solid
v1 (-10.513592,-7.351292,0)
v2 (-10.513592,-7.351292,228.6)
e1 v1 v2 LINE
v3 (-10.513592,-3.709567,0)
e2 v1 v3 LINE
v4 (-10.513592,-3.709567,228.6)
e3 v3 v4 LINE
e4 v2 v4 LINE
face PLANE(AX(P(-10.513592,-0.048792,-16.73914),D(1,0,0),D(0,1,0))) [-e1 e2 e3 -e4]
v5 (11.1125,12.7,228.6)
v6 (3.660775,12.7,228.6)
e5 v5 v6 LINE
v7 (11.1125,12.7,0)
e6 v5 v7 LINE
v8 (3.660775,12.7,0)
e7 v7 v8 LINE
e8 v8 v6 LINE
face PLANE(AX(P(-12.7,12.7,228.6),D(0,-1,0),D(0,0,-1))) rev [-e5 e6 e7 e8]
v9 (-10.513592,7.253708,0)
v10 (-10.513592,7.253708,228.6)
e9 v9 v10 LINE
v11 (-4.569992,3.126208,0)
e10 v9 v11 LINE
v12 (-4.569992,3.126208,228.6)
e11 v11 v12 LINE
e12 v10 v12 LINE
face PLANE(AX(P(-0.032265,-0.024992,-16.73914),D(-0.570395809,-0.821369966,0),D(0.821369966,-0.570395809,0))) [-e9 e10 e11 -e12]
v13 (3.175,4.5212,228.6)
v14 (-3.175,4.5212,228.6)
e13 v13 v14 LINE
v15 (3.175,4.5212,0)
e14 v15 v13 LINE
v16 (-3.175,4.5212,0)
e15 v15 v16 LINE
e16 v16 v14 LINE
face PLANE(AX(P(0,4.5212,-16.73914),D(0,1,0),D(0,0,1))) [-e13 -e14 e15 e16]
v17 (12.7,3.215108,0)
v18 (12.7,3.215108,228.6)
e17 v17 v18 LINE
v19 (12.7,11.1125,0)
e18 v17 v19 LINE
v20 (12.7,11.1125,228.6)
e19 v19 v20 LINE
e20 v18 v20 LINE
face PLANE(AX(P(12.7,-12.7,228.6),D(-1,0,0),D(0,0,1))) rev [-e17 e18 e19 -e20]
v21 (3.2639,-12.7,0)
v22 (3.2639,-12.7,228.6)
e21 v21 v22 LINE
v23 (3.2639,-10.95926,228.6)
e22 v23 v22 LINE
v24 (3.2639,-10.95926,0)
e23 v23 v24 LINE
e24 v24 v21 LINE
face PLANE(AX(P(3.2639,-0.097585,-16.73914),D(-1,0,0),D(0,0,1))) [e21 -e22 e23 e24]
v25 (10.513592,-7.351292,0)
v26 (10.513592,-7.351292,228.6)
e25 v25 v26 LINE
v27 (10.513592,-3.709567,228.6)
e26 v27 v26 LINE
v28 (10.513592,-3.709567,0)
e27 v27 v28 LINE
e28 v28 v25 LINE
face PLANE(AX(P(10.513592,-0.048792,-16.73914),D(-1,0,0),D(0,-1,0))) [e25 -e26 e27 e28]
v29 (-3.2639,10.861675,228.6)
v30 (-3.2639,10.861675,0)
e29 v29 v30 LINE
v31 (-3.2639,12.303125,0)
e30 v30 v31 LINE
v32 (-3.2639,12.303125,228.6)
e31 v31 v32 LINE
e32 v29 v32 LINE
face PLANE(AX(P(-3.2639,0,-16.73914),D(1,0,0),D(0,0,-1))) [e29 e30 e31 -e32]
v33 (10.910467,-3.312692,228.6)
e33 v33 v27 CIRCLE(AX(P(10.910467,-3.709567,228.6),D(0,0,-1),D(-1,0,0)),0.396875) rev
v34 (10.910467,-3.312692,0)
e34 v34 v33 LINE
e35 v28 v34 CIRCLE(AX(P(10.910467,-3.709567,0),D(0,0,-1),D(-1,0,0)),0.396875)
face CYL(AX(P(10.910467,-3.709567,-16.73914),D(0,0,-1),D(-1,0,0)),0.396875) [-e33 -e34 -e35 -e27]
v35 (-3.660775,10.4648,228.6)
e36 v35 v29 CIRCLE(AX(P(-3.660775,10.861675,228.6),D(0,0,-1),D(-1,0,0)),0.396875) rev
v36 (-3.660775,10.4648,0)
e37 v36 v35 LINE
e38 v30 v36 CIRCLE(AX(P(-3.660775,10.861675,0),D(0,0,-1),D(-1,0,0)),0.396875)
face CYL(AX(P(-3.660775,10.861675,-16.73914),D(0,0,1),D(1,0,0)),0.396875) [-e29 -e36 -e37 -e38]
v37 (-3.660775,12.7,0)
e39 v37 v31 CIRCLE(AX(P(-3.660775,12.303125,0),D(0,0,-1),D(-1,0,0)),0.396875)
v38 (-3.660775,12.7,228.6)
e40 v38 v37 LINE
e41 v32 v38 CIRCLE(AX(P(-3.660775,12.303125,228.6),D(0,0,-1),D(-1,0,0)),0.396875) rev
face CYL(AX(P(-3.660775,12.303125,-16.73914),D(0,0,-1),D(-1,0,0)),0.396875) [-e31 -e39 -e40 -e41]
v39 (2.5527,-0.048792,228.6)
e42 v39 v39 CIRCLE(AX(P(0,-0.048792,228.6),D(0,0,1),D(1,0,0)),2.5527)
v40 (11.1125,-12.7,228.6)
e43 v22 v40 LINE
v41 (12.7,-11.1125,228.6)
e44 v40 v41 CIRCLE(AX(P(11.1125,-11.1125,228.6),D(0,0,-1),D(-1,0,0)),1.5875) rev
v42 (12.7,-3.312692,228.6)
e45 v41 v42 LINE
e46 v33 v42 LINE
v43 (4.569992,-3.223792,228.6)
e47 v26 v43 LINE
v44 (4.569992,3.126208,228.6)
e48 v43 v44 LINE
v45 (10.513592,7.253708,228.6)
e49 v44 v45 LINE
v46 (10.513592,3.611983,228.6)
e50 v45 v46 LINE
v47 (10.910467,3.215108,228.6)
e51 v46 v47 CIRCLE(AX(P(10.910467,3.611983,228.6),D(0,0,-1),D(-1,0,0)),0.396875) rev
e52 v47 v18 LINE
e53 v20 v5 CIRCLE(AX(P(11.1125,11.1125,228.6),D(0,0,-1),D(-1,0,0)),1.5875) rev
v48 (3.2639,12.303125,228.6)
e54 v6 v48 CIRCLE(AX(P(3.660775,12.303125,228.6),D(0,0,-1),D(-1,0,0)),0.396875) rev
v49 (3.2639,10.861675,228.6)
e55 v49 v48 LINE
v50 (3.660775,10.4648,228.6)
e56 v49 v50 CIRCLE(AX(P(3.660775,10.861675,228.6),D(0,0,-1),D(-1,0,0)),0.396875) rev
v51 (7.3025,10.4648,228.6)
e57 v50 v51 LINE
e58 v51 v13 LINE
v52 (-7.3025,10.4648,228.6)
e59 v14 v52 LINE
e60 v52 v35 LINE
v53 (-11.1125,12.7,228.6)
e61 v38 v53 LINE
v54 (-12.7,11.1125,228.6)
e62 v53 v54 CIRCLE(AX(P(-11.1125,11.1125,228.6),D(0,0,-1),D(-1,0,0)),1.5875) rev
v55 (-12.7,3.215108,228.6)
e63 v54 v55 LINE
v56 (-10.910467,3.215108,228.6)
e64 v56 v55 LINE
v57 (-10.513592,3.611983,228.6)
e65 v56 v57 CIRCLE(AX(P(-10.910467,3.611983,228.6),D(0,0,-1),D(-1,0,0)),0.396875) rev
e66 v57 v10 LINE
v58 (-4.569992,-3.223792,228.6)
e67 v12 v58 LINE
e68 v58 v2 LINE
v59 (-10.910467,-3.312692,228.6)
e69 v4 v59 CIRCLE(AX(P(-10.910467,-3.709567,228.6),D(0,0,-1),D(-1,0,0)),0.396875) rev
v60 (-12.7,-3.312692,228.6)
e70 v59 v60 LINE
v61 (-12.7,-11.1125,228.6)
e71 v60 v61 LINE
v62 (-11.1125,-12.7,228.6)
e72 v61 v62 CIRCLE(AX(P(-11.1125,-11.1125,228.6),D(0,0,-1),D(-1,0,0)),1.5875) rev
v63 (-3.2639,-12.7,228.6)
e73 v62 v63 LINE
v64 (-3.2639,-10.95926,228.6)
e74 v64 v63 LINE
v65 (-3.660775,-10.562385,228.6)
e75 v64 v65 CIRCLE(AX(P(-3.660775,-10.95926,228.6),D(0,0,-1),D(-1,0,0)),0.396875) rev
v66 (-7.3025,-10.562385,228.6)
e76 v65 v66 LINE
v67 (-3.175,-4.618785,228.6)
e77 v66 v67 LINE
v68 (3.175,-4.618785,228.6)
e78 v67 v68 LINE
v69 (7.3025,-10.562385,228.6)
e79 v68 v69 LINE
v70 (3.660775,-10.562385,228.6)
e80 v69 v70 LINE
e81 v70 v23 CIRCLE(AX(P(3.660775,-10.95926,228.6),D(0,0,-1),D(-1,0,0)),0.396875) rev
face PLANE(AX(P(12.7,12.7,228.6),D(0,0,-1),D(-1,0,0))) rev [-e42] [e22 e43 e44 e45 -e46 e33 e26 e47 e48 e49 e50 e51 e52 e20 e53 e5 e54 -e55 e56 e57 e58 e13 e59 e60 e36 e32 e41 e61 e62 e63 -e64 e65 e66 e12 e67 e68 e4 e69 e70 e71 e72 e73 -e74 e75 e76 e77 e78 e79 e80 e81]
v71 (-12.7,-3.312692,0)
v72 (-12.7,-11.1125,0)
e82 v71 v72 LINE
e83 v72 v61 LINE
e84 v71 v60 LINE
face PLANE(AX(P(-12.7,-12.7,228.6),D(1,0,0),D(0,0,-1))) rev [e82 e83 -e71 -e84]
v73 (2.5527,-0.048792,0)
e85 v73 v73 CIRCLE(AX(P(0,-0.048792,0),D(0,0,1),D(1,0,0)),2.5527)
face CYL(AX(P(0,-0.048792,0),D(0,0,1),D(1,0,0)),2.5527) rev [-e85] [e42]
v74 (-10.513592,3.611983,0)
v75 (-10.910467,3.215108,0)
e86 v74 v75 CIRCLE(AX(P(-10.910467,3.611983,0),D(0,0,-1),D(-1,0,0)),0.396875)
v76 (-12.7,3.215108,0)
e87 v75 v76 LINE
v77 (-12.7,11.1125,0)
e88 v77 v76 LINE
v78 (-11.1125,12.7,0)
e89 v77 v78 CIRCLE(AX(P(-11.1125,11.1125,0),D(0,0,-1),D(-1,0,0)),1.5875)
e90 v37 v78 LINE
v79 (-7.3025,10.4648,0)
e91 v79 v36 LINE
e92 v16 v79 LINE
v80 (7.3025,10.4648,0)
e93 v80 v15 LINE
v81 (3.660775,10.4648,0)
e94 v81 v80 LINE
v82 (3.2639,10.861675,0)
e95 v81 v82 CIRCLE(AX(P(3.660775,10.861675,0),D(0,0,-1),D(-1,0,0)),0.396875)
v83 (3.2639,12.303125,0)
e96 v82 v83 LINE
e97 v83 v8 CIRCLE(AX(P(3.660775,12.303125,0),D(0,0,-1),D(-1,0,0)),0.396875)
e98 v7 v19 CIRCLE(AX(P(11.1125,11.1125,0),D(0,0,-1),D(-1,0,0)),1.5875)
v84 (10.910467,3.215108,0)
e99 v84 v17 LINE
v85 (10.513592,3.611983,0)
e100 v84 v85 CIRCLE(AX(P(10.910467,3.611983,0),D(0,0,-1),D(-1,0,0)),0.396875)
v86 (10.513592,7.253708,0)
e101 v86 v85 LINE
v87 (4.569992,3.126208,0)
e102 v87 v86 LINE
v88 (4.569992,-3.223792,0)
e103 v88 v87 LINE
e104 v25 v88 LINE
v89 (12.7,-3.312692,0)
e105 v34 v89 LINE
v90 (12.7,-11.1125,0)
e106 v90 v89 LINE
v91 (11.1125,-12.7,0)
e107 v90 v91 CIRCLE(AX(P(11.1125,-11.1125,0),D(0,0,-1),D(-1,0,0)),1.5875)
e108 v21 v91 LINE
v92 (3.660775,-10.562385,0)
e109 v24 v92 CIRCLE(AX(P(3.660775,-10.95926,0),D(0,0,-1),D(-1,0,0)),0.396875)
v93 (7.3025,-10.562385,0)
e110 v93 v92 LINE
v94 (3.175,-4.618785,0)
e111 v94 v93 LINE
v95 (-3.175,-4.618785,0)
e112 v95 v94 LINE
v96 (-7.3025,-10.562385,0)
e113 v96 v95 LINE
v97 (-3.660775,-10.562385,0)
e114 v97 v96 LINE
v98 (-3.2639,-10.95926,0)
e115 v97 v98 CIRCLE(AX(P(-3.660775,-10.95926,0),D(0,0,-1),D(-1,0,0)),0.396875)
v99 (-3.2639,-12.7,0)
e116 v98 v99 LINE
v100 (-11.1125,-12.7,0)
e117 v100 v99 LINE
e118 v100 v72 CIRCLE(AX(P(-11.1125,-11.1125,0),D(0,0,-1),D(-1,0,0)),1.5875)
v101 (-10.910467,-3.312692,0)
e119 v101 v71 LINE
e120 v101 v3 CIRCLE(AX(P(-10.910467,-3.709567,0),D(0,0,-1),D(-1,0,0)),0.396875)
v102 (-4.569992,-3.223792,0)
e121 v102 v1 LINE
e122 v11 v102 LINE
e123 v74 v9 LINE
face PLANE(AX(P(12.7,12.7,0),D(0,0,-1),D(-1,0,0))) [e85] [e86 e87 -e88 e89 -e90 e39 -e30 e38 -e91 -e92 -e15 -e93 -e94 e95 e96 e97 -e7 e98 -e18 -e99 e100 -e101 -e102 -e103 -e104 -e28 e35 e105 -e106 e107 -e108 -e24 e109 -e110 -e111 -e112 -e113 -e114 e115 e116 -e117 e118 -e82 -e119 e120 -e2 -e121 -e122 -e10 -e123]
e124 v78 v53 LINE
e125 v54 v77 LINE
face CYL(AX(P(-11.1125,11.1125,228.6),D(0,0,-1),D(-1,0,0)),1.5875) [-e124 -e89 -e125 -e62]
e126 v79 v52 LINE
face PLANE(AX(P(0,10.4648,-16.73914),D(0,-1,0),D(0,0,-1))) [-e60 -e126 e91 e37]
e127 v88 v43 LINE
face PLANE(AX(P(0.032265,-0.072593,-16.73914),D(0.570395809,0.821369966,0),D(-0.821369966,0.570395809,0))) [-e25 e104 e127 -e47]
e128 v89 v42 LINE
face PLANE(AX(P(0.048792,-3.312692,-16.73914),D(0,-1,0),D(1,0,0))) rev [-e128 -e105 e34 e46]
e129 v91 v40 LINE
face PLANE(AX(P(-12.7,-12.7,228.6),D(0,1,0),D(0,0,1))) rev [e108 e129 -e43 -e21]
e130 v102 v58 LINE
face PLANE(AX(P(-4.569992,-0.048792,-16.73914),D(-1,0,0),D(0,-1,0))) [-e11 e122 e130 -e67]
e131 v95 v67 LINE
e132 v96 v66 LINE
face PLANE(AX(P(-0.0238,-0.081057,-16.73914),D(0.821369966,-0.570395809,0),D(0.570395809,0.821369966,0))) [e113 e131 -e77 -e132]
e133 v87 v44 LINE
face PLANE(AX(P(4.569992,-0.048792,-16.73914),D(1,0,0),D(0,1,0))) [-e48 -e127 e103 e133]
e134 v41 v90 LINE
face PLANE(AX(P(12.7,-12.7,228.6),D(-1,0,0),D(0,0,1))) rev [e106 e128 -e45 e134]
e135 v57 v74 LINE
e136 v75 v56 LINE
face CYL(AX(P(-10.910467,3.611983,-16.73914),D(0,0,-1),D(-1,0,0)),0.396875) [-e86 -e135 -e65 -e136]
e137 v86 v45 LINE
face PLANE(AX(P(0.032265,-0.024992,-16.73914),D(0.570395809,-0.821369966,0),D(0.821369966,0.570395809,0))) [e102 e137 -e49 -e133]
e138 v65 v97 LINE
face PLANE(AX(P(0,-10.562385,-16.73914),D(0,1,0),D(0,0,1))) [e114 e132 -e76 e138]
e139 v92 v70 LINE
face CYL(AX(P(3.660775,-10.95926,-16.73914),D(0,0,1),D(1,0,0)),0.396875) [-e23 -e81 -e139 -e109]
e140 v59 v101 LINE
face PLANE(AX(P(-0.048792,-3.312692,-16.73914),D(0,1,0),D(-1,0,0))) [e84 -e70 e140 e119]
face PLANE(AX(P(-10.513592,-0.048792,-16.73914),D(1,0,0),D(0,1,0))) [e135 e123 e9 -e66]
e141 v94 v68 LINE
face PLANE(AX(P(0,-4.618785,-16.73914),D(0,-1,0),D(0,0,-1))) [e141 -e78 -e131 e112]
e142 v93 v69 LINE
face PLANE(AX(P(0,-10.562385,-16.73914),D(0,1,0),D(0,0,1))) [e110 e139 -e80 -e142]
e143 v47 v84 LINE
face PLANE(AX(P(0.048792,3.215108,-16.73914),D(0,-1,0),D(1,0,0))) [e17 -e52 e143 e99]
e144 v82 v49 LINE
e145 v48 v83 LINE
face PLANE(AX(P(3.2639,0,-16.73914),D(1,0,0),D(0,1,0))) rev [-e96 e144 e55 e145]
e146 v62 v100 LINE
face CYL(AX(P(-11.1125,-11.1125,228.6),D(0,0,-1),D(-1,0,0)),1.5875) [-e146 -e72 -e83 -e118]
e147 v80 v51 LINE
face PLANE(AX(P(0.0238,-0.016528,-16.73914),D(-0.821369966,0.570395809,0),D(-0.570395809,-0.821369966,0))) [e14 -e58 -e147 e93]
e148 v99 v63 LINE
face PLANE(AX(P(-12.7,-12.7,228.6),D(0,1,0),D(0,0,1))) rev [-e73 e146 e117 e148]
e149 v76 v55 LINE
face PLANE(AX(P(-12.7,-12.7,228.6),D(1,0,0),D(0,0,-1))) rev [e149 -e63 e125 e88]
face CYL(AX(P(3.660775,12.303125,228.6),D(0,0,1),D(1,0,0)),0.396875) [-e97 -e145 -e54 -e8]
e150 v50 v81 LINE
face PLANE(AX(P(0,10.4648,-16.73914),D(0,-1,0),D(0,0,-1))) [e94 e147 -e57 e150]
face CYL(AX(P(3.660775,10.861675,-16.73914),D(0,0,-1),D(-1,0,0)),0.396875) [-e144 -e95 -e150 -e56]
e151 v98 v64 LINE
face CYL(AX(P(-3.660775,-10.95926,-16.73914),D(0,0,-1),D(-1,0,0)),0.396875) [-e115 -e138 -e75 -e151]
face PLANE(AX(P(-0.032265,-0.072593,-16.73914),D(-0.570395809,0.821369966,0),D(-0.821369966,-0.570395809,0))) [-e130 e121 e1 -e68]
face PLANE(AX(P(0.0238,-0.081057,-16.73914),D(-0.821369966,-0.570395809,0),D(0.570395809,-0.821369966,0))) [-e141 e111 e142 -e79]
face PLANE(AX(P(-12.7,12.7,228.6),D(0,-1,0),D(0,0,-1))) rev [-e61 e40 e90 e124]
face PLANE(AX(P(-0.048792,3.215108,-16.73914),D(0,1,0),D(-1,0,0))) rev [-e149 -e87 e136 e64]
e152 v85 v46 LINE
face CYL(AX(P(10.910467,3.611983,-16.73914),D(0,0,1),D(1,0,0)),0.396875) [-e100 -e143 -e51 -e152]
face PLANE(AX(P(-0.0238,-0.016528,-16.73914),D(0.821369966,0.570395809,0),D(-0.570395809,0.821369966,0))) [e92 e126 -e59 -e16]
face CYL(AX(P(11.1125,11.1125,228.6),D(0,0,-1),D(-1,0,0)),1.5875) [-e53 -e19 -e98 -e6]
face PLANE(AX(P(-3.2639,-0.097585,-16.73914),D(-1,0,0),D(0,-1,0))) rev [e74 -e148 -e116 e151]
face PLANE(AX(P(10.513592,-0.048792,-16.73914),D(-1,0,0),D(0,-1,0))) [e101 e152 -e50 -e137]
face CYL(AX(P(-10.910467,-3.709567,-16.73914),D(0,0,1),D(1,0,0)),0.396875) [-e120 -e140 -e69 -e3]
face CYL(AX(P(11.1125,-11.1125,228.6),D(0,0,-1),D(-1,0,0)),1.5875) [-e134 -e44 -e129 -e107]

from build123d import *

# Parameters (mm, degrees)
SKETCH1_W           = 25.4
SKETCH1_H           = 25.4
BOSS_EXTRUDE1_DEPTH = 228.6
FILLET1_R           = 1.5875
HOLE1_OUTLINE_R     = 2.5527
HOLE1_DEPTH         = 228.6
SKETCH7_W           = 6.5278
SKETCH7_H           = 2.2352
CUT_EXTRUDE2_DEPTH  = 228.6
FILLET4_R           = 0.396875
CIRPATTERN2_DEPTH   = 228.6


# Read off the part's stored shape, not the designer's step: Hole1, CirPattern2
with BuildPart() as part:
    # Sketch1 → Boss-Extrude1 (new body)
    with BuildSketch(Plane.XY):
        Rectangle(SKETCH1_W, SKETCH1_H)
    extrude(amount=BOSS_EXTRUDE1_DEPTH)

    # Fillet1
    fillet1_edges = [part.edges().sort_by_distance(p)[0] for p in [
        (12.7, -12.7, 114.3),
        (-12.7, -12.7, 114.3),
        (-12.7, 12.7, 114.3),
        (12.7, 12.7, 114.3),
    ]]
    fillet(fillet1_edges, radius=FILLET1_R)

    # Hole1 outline → Hole1 (cut)
    with BuildSketch(Plane.XY):
        with Locations((0, -0.048792482)):
            Circle(HOLE1_OUTLINE_R)
    extrude(amount=HOLE1_DEPTH, mode=Mode.SUBTRACT)

    # Sketch7 → Cut-Extrude2 (cut)
    with BuildSketch(Plane.XY.offset(228.6)):
        with Locations((0, 11.5824)):
            Rectangle(SKETCH7_W, SKETCH7_H)
        Polygon((-3.175, 4.5212), (-7.3025, 10.4648), (7.3025, 10.4648), (3.175, 4.5212), align=None)
    extrude(amount=-CUT_EXTRUDE2_DEPTH, mode=Mode.SUBTRACT)

    # Fillet4
    fillet4_edges = [part.edges().sort_by_distance(p)[0] for p in [
        (-3.2639, 10.4648, 114.3),
        (-3.2639, 12.7, 114.3),
        (3.2639, 12.7, 114.3),
        (3.2639, 10.4648, 114.3),
    ]]
    fillet(fillet4_edges, radius=FILLET4_R)

    # CirPattern2 outline → CirPattern2 (cut)
    with BuildSketch(Plane.XY):
        with BuildLine():
            ThreePointArc((-3.660775, -10.562384964), (-3.380141996, -10.67862696), (-3.2639, -10.959259964))
            Line((-3.2639, -10.959259964), (-3.2639, -12.7))
            Line((-3.2639, -12.7), (3.2639, -12.7))
            Line((3.2639, -12.7), (3.2639, -10.959259964))
            ThreePointArc((3.2639, -10.959259964), (3.380141996, -10.67862696), (3.660775, -10.562384964))
            Line((3.660775, -10.562384964), (7.3025, -10.562384964))
            Line((7.3025, -10.562384964), (3.175, -4.618784964))
            Line((3.175, -4.618784964), (-3.175, -4.618784964))
            Line((-3.175, -4.618784964), (-7.3025, -10.562384964))
            Line((-7.3025, -10.562384964), (-3.660775, -10.562384964))
        make_face()
        with BuildLine():
            Line((-12.7, -3.312692482), (-10.910467482, -3.312692482))
            ThreePointArc((-10.910467482, -3.312692482), (-10.629834478, -3.428934478), (-10.513592482, -3.709567482))
            Line((-10.513592482, -3.709567482), (-10.513592482, -7.351292482))
            Line((-10.513592482, -7.351292482), (-4.569992482, -3.223792482))
            Line((-4.569992482, -3.223792482), (-4.569992482, 3.126207518))
            Line((-4.569992482, 3.126207518), (-10.513592482, 7.253707518))
            Line((-10.513592482, 7.253707518), (-10.513592482, 3.611982518))
            ThreePointArc((-10.513592482, 3.611982518), (-10.629834478, 3.331349514), (-10.910467482, 3.215107518))
            Line((-10.910467482, 3.215107518), (-12.7, 3.215107518))
            Line((-12.7, 3.215107518), (-12.7, -3.312692482))
        make_face()
        with BuildLine():
            ThreePointArc((10.513592482, -3.709567482), (10.629834478, -3.428934478), (10.910467482, -3.312692482))
            Line((10.910467482, -3.312692482), (12.7, -3.312692482))
            Line((12.7, -3.312692482), (12.7, 3.215107518))
            Line((12.7, 3.215107518), (10.910467482, 3.215107518))
            ThreePointArc((10.910467482, 3.215107518), (10.629834478, 3.331349514), (10.513592482, 3.611982518))
            Line((10.513592482, 3.611982518), (10.513592482, 7.253707518))
            Line((10.513592482, 7.253707518), (4.569992482, 3.126207518))
            Line((4.569992482, 3.126207518), (4.569992482, -3.223792482))
            Line((4.569992482, -3.223792482), (10.513592482, -7.351292482))
            Line((10.513592482, -7.351292482), (10.513592482, -3.709567482))
        make_face()
    extrude(amount=CIRPATTERN2_DEPTH, mode=Mode.SUBTRACT)


solid = part.part
